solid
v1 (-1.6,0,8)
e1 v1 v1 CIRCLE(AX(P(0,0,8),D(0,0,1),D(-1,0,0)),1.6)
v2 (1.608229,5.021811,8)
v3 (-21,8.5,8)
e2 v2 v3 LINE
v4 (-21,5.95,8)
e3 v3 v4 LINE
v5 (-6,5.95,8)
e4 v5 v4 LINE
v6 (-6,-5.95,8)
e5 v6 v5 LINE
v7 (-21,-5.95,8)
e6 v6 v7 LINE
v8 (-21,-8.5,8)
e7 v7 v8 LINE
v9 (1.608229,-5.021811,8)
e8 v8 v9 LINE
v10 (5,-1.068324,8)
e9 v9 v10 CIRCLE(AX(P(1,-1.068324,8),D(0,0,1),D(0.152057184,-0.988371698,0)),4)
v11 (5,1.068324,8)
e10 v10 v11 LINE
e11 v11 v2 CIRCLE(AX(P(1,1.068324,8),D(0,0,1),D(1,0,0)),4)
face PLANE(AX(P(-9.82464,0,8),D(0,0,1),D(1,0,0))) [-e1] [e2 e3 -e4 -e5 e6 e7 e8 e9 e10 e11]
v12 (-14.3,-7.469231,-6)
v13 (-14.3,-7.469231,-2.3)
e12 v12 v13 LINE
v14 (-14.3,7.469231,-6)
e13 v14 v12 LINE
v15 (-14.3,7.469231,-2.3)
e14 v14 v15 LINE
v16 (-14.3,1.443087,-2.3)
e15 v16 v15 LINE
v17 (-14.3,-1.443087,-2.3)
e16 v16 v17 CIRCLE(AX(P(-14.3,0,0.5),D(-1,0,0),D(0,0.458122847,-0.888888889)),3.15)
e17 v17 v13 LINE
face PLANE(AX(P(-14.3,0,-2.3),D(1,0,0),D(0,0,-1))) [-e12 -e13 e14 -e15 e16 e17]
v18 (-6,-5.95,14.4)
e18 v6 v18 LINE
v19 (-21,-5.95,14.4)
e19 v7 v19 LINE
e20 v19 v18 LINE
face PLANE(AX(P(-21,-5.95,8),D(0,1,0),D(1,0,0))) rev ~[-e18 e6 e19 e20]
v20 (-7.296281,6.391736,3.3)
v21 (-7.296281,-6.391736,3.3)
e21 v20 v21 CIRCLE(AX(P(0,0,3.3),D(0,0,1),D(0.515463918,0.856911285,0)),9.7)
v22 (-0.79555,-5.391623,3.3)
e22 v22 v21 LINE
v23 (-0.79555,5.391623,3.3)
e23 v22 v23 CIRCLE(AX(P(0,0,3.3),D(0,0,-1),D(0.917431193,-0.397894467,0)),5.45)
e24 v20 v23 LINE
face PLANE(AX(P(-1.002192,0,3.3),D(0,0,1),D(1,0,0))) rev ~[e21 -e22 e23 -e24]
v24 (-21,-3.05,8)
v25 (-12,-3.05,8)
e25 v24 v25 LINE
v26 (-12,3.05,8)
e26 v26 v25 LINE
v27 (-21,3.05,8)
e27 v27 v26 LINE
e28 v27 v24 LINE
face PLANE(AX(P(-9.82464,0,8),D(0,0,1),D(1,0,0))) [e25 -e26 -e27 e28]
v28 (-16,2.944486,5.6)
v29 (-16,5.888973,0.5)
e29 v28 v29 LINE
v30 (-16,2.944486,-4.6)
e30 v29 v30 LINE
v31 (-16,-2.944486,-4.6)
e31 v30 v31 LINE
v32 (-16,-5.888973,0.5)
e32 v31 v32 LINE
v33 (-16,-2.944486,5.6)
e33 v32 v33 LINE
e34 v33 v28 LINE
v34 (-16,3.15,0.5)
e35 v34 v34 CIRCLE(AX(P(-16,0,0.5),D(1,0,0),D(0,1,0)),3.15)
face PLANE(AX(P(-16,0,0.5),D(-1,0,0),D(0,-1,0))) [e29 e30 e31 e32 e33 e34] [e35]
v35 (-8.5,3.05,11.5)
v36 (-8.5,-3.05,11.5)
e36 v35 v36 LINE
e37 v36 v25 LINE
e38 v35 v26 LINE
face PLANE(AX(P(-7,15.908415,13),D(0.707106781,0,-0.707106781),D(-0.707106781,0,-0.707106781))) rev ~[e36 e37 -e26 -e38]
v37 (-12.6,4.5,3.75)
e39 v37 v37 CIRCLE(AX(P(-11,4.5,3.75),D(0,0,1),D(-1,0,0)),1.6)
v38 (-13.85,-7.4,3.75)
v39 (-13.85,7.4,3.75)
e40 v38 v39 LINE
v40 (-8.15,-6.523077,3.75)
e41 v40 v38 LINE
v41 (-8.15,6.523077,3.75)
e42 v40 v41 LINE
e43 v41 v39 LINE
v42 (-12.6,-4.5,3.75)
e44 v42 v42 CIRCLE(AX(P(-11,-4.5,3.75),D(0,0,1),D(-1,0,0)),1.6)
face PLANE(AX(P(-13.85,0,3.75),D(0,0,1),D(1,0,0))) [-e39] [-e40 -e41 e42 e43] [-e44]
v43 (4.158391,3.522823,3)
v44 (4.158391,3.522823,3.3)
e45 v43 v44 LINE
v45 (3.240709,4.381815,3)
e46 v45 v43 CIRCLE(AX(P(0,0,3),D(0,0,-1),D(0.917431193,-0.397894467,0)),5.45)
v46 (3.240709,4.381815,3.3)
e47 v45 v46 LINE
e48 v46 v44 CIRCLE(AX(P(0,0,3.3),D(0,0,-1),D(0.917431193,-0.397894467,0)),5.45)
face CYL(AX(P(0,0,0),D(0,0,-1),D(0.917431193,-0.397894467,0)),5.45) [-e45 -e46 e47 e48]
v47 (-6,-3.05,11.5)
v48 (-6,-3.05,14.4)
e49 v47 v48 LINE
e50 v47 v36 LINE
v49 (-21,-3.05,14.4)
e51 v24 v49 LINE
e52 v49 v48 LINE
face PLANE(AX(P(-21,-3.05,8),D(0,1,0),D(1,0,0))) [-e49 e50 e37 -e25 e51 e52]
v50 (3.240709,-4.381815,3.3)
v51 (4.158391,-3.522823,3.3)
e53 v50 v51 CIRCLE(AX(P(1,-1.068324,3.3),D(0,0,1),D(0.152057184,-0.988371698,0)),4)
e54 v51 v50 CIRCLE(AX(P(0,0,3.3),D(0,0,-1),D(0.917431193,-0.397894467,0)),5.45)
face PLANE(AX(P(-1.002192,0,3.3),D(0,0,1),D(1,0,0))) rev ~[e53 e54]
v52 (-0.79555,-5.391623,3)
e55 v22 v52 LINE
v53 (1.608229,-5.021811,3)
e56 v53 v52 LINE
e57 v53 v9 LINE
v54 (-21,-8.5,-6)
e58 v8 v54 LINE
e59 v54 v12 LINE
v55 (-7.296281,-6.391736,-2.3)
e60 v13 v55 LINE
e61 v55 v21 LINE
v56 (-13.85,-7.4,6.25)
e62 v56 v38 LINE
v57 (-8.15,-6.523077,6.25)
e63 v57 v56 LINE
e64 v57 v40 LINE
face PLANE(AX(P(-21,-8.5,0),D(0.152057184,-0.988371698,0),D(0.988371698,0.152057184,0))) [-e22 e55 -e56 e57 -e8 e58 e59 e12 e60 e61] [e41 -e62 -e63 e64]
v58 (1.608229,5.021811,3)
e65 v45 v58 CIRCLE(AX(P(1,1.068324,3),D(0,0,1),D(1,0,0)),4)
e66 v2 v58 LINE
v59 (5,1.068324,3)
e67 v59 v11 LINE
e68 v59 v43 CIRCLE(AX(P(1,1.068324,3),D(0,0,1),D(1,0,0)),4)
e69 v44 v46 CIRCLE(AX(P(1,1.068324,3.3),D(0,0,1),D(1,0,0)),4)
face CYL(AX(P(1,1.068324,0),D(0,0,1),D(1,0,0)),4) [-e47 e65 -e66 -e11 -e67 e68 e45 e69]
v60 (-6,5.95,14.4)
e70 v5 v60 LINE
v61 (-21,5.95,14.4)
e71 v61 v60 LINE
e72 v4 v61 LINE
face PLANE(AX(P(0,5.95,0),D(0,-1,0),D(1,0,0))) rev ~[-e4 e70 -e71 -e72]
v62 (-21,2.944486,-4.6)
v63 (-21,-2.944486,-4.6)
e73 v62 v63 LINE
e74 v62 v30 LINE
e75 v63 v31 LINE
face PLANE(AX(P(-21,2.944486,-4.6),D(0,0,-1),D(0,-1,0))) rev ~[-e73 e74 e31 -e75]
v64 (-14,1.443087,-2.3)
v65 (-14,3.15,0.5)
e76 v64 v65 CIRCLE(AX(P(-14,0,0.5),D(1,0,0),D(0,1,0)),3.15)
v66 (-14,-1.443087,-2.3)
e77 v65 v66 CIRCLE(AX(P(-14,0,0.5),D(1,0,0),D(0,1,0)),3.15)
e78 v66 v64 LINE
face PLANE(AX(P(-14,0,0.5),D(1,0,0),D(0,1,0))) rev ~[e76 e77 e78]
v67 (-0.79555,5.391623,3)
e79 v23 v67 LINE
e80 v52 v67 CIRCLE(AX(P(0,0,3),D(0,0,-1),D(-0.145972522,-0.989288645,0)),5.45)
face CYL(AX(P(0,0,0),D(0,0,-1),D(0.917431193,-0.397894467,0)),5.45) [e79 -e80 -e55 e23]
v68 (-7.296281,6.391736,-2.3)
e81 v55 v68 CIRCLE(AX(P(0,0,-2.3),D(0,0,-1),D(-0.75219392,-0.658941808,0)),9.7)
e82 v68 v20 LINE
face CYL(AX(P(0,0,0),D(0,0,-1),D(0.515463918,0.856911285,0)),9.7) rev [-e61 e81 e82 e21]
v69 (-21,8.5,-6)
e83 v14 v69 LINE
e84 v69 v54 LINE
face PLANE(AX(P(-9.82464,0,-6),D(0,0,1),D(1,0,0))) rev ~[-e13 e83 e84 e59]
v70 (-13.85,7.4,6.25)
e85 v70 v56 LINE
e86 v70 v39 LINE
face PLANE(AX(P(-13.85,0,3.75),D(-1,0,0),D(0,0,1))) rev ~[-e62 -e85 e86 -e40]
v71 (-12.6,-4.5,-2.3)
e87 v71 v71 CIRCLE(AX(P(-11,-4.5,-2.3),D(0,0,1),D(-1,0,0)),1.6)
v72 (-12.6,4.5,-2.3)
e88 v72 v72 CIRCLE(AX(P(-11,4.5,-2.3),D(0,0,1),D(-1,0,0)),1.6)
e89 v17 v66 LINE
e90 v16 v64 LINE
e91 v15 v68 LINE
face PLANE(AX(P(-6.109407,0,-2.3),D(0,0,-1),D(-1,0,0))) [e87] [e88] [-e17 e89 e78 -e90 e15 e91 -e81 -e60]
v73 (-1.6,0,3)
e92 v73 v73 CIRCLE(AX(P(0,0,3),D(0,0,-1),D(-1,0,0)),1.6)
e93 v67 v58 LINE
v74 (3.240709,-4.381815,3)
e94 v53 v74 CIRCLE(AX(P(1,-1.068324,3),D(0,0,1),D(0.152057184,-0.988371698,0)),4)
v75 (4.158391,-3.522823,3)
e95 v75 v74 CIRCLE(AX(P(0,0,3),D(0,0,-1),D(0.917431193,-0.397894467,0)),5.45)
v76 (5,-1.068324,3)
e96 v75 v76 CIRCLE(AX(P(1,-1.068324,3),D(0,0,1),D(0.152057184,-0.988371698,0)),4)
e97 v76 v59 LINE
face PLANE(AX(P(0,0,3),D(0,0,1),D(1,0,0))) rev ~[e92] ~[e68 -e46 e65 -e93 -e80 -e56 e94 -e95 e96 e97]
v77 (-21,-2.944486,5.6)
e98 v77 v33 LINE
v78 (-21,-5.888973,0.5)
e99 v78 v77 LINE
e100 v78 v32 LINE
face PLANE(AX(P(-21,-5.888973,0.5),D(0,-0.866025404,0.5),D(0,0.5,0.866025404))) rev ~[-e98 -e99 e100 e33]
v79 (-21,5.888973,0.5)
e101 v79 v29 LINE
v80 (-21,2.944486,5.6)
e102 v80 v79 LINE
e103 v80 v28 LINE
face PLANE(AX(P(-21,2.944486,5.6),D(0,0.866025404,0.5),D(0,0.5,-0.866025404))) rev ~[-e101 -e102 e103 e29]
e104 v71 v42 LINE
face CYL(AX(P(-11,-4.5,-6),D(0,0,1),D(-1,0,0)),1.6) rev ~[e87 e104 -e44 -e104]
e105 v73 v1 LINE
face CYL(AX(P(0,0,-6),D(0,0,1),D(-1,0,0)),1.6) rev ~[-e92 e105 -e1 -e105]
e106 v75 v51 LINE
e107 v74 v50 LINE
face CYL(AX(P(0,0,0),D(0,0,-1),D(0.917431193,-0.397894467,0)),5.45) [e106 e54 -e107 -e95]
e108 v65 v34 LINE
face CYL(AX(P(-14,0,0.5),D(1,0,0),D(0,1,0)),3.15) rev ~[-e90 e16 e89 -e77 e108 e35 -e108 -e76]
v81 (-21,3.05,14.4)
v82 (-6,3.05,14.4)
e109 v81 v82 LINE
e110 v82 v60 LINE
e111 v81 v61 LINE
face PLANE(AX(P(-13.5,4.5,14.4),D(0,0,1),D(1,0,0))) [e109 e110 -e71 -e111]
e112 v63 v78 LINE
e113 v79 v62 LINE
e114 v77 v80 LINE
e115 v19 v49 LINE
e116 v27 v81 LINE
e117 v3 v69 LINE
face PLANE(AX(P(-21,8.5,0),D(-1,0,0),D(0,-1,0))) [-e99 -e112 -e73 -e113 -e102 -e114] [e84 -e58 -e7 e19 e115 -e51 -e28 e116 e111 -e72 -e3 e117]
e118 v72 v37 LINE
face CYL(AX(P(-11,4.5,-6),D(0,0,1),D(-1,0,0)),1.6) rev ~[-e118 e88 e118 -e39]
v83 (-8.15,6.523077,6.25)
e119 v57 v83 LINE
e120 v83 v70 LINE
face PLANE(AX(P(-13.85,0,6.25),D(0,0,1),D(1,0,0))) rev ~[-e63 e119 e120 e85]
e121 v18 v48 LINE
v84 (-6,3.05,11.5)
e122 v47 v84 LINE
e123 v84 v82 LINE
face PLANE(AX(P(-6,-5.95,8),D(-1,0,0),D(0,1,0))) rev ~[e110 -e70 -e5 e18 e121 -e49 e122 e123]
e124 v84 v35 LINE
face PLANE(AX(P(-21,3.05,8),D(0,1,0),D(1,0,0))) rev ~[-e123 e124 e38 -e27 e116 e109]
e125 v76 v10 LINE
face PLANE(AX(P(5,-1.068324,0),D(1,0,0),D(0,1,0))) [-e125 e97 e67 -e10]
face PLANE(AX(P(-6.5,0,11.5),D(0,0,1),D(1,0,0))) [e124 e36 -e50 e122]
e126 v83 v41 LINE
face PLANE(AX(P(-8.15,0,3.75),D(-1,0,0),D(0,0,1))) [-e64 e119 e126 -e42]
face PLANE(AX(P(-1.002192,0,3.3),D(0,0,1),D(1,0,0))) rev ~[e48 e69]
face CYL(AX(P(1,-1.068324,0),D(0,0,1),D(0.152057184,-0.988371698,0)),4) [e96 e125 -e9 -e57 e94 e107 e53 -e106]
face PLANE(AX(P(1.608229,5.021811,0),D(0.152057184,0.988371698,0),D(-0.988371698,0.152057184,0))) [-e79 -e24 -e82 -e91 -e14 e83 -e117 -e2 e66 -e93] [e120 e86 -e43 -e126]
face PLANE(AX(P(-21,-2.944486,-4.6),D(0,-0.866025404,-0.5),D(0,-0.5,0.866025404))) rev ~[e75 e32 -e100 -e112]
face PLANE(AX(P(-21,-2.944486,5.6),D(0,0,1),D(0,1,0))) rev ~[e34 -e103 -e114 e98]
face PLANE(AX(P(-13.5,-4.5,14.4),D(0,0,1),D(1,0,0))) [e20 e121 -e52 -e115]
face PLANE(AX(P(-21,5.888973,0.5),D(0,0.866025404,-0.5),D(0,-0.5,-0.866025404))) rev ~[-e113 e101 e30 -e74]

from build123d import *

# Parameters (mm, degrees)
F1_DEPTH        = 8
F1_DEPTH_BACK   = 6
F2_R            = 8.3
F2_R_2          = 2.95
F3_DEPTH        = 3
F3_DEPTH_BACK   = 3
F5_DEPTH        = 3.3
F5_DEPTH_BACK   = 3.3
F7_START        = -14
F6_R            = 3.15
F7_DEPTH        = 26
F9_DEPTH        = 5
F10_W           = 15
F10_H           = 2.9
F11_DEPTH       = 6.4
F12_W           = 1
F12_H           = 6.5
F13_DEPTH       = 3.5
F14_T4_DEPTH    = 31.8168298797
F16_D           = 3.2
F16_DEPTH       = 11
F16_CBORE_D     = 6.5
F16_CBORE_DEPTH = 2.5
F16_TIP         = 0.9613769904
F18_D           = 3.2
F18_CBORE_D     = 6.2
F18_CBORE_DEPTH = 2.6
F20_DEPTH       = 25
F20_DEPTH_BACK  = 25
F21_W           = 5.7
F21_H           = 2.5
F22_DEPTH       = 25
F22_DEPTH_BACK  = 25


# Not quite as in the source:
# - a fillet or chamfer that OpenCascade refuses, or shapes differently, is made with other operations: its cross-section is extruded or revolved along the edge and cut away or added


with BuildPart() as f1:
    # F0 (on Top) → F1 (new body, two sides)
    with BuildSketch(Plane.XY) as f1_sk:
        with BuildLine():
            Line((-21, -8.5), (1.608228737, -5.0218109635))
            ThreePointArc((1.608228737, -5.0218109635), (4.0358618997, -3.6728476468), (5, -1.0683241729))
            Line((5, -1.0683241729), (5, 1.0683241729))
            ThreePointArc((5, 1.0683241729), (4.0358618997, 3.6728476468), (1.608228737, 5.0218109635))
            Line((1.608228737, 5.0218109635), (-21, 8.5))
            Line((-21, 8.5), (-21, -8.5))
        make_face()
    extrude(amount=F1_DEPTH)
    extrude(f1_sk.sketch, amount=-F1_DEPTH_BACK)

    # F2 (on Top) → F3 (cut, two sides)
    with BuildSketch(Plane.XY) as f3_sk:
        Circle(F2_R)
        Circle(F2_R_2, mode=Mode.SUBTRACT)
    extrude(amount=-F3_DEPTH, mode=Mode.SUBTRACT)
    extrude(f3_sk.sketch, amount=F3_DEPTH_BACK, mode=Mode.SUBTRACT)

    # F4 (on Top) → F5 (cut, two sides)
    with BuildSketch(Plane.XY) as f5_sk:
        with BuildLine():
            ThreePointArc((5, -2.1685248442), (-5.45, 0), (5, 2.1685248442))
            Line((5, 2.1685248442), (5, 8.3120394609))
            ThreePointArc((5, 8.3120394609), (-9.7, 0), (5, -8.3120394609))
            Line((5, -8.3120394609), (5, -2.1685248442))
        make_face()
    extrude(amount=F5_DEPTH, mode=Mode.SUBTRACT)
    extrude(f5_sk.sketch, amount=-F5_DEPTH_BACK, mode=Mode.SUBTRACT)

    # F6 (on Right) → F7 (cut)
    with BuildSketch(Plane.YZ.offset(F7_START)):
        with Locations((0, 0.5)):
            Circle(F6_R)
    extrude(amount=-F7_DEPTH, mode=Mode.SUBTRACT)

    # F8 (on face) → F9 (cut)
    with BuildSketch(Plane(origin=(-21, 0, 0), x_dir=(0, -1, 0), z_dir=(-1, 0, 0))):
        Polygon((2.9444863729, 5.6), (-2.9444863729, 5.6), (-5.8889727457, 0.5), (-2.9444863729, -4.6), (2.9444863729, -4.6), (5.8889727457, 0.5), align=None)
    extrude(amount=-F9_DEPTH, mode=Mode.SUBTRACT)

    # F10 (on face) → F11 (join)
    with BuildSketch(Plane.XY.offset(8)):
        with Locations((-13.5, 4.5)):
            Rectangle(F10_W, F10_H)
        with Locations((-13.5, -4.5)):
            Rectangle(F10_W, F10_H)
    extrude(amount=F11_DEPTH)

    # F12 (on face) → F13 (join)
    with BuildSketch(Plane.XY.offset(8)):
        with Locations((-6.5, 0)):
            Rectangle(F12_W, F12_H)
    extrude(amount=F13_DEPTH)

    # F14: chamfer of 5 on 1 edges, made by hand


with BuildPart() as f14_tool2:
    # F14_s3 → F14_t4 (new body)
    with BuildSketch(Plane.XZ.offset(-15.9084149398)):
        Polygon((-7, 13), (-12, 8), (-7, 8), align=None)
    extrude(amount=F14_T4_DEPTH)

    split(bisect_by=Plane.XY.offset(11.5), keep=Keep.BOTTOM)

    split(bisect_by=Plane.XZ.offset(-5.95), keep=Keep.TOP)

    split(bisect_by=Plane.XZ.offset(5.95), keep=Keep.BOTTOM)


with BuildPart() as f1_1:
    add(f1.part)

    # F14_t1: union F14_tool2
    add(f14_tool2.part)

    # F16
    with Locations(Plane(origin=(0, 0, -6), x_dir=(1, 0, 0), z_dir=(0, 0, -1))):
        with Locations((-11, -4.5), (-11, 4.5)):
            CounterBoreHole(F16_D / 2, F16_CBORE_D / 2, F16_CBORE_DEPTH, depth=F16_DEPTH)
            with Locations((0, 0, -(F16_DEPTH + F16_TIP / 2))):  # 118° drill point
                Cone(0, F16_D / 2, F16_TIP, mode=Mode.SUBTRACT)

    # F18 (through all)
    with Locations(Plane(origin=(0, 0, -6), x_dir=(1, 0, 0), z_dir=(0, 0, -1))):
        with Locations((0, 0)):
            CounterBoreHole(F18_D / 2, F18_CBORE_D / 2, F18_CBORE_DEPTH)

    # F19 (on Front) → F20 (cut, two sides)
    with BuildSketch(Plane.XZ) as f20_sk:
        Polygon((9.8263500258, -7.5822613659), (9.9938229204, 3), (-6.1094067059, 3), (-6.1094067059, -2.3), (-14.3, -2.3), (-14.3, -7.5822613659), align=None)
    extrude(amount=-F20_DEPTH, mode=Mode.SUBTRACT)
    extrude(f20_sk.sketch, amount=F20_DEPTH_BACK, mode=Mode.SUBTRACT)

    # F21 (on Front) → F22 (cut, two sides)
    with BuildSketch(Plane.XZ) as f22_sk:
        with Locations((-11, 5)):
            Rectangle(F21_W, F21_H)
    extrude(amount=-F22_DEPTH, mode=Mode.SUBTRACT)
    extrude(f22_sk.sketch, amount=F22_DEPTH_BACK, mode=Mode.SUBTRACT)


solid = f1_1.part
